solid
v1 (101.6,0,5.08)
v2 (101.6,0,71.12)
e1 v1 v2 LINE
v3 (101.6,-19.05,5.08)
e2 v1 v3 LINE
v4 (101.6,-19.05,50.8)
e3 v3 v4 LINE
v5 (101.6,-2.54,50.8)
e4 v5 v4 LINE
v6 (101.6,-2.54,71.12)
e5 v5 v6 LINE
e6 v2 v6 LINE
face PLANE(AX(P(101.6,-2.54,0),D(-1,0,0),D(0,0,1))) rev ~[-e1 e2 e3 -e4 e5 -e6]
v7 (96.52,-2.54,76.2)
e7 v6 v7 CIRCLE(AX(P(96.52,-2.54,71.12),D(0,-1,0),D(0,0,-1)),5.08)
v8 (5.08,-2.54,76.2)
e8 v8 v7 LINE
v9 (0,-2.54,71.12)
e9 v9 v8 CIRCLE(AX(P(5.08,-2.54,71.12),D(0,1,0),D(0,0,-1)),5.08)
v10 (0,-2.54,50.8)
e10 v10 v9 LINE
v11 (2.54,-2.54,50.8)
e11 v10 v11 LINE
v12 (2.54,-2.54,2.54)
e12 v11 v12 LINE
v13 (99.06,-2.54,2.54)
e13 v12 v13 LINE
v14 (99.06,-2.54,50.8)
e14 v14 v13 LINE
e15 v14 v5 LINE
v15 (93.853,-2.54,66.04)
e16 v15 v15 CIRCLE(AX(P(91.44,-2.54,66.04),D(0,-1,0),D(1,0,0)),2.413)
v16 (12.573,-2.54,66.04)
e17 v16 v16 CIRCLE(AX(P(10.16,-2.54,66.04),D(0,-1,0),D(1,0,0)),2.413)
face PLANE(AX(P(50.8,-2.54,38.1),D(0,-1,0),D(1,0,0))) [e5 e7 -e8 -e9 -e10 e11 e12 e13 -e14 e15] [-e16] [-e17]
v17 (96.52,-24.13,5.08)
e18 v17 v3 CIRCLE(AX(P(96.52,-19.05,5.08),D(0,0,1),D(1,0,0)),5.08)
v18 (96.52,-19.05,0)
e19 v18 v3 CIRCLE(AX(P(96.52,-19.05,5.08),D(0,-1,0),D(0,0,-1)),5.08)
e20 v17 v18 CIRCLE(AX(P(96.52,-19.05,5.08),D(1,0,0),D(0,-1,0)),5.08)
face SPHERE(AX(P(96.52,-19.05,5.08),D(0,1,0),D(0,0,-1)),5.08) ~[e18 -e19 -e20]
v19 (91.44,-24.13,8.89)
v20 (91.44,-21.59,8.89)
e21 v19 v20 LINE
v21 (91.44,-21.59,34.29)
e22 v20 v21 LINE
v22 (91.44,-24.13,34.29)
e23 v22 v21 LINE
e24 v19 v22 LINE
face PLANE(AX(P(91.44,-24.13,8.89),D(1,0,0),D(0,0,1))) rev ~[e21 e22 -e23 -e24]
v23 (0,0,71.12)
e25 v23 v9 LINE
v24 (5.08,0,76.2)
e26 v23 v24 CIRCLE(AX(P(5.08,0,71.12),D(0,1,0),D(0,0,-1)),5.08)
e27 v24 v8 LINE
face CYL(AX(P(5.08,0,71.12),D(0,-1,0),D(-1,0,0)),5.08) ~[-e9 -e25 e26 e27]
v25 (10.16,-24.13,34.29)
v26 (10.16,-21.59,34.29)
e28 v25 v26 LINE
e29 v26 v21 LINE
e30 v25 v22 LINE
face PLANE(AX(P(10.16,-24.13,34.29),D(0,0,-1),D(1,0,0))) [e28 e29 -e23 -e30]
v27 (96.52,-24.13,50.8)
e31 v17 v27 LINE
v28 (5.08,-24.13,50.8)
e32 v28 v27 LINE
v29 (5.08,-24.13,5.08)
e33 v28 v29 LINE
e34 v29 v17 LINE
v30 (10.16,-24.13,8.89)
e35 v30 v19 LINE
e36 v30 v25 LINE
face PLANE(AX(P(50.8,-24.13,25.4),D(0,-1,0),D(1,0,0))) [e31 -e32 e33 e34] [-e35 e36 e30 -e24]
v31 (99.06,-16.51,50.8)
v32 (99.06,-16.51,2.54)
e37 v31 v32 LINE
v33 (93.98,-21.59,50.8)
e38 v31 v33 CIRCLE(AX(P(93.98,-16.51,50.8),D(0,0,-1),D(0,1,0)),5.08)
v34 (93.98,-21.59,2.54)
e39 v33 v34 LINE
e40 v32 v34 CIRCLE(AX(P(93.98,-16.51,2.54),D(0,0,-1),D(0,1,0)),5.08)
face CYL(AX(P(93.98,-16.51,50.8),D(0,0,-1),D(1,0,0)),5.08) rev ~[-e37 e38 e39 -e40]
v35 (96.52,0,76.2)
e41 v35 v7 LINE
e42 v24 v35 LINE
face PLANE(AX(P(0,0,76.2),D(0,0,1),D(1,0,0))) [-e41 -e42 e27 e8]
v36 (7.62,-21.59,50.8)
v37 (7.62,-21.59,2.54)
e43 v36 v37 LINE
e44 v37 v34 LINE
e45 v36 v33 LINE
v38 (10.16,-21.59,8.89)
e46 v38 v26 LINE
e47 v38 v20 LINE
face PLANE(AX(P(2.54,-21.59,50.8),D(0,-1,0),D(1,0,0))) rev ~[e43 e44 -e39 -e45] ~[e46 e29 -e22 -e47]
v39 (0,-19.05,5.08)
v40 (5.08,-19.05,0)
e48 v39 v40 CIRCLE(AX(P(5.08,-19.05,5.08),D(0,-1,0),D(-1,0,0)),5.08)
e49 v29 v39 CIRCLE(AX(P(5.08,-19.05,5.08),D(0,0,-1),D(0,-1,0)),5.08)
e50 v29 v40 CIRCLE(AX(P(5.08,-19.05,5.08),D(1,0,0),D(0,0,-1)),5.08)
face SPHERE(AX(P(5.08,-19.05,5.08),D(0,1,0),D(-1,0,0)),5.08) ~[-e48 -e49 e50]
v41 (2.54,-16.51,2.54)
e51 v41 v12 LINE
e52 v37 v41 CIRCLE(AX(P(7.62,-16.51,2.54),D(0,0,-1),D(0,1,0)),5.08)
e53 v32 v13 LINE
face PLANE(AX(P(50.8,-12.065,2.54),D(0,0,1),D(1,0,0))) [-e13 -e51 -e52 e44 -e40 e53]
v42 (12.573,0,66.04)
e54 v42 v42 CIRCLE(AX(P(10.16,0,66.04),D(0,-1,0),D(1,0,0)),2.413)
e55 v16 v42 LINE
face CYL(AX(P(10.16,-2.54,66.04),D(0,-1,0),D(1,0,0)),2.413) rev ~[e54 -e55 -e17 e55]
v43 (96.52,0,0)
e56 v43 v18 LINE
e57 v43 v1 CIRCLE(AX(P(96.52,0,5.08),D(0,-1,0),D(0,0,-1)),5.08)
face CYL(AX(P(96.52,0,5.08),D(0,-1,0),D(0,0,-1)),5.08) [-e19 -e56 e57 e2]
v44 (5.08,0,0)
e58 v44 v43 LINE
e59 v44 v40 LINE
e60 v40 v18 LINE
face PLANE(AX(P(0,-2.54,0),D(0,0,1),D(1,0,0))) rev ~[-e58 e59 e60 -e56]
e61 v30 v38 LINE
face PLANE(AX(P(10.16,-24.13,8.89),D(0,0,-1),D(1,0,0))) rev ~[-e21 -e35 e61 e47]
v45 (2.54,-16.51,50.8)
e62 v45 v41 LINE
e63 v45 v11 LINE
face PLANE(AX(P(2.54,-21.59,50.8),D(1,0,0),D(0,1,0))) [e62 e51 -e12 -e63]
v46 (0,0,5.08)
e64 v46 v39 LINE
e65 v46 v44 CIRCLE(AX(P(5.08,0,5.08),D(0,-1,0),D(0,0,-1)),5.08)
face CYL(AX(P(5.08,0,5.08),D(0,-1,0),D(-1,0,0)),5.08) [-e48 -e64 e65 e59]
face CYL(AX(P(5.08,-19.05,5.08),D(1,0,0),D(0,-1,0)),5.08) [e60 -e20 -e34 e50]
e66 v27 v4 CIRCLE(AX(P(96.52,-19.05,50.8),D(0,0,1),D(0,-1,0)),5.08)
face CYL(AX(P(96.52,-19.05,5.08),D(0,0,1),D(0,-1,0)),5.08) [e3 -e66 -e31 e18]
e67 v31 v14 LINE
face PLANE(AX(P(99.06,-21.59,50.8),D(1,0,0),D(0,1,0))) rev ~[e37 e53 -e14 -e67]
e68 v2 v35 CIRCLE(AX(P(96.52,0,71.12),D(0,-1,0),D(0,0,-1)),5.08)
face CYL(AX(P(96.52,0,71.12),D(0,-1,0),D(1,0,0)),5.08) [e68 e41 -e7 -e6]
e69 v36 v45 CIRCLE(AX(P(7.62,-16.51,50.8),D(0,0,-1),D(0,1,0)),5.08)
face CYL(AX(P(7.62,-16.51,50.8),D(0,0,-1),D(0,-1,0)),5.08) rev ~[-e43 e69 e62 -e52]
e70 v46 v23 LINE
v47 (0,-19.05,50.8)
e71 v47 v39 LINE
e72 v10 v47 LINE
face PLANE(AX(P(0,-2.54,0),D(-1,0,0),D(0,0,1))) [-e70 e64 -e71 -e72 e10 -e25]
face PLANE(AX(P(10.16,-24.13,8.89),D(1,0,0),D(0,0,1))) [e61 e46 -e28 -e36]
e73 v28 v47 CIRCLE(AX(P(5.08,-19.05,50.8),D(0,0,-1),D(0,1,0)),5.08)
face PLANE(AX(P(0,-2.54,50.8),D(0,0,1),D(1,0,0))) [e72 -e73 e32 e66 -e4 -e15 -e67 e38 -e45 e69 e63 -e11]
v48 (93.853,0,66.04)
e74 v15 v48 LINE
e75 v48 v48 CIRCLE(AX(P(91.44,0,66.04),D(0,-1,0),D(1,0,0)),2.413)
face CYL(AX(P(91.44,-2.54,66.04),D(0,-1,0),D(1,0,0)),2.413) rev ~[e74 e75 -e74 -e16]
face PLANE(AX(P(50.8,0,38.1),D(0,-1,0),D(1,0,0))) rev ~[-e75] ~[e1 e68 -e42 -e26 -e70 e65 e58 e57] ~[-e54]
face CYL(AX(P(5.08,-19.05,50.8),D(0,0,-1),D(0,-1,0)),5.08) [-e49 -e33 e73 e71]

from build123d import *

# Parameters (mm, degrees)
F0_W      = 101.6
F0_H      = 76.2
F1_DEPTH  = 2.54
F2_W      = 101.6
F2_H      = 50.8
F3_DEPTH  = 21.59
F4_R      = 5.08
F5_W      = 96.52
F5_H      = 19.05
F6_DEPTH  = 48.26
F7_R      = 5.08
F8_R      = 5.08
F9_R      = 5.08
F11_W     = 81.28
F11_H     = 25.4
F12_DEPTH = 21.59
F13_R     = 2.413
F14_DEPTH = 2.541


# Not quite as in the source:
# - a feature of the source that left no trace in its solid (it failed there, or was rolled back) is left out


with BuildPart() as f1:
    # F0 (on Front) → F1 (new body)
    with BuildSketch(Plane.XZ):
        with Locations((50.8, 38.1)):
            Rectangle(F0_W, F0_H)
    extrude(amount=F1_DEPTH)

    # F2 (on face) → F3 (join)
    with BuildSketch(Plane.XZ.offset(2.54)):
        with Locations((50.8, 25.4)):
            Rectangle(F2_W, F2_H)
    extrude(amount=F3_DEPTH)

    # F4
    f4_edges = [f1.edges().sort_by_distance(p)[0] for p in [
        (101.6, -1.27, 76.2),
        (101.6, -12.065, 0),
        (0, -12.065, 0),
        (0, -1.27, 76.2),
    ]]
    fillet(f4_edges, radius=F4_R)

    # F5 (on face) → F6 (cut)
    with BuildSketch(Plane.XY.offset(50.8)):
        with Locations((50.8, -12.065)):
            Rectangle(F5_W, F5_H)
    extrude(amount=-F6_DEPTH, mode=Mode.SUBTRACT)

    # F7
    f7_edges = [f1.edges().sort_by_distance(p)[0] for p in [
        (101.6, -24.13, 27.94),
    ]]
    fillet(f7_edges, radius=F7_R)

    # F8
    f8_edges = [f1.edges().sort_by_distance(p)[0] for p in [
        (99.06, -21.59, 26.67),
    ]]
    fillet(f8_edges, radius=F8_R)

    # F9
    f9_edges = [f1.edges().sort_by_distance(p)[0] for p in [
        (2.54, -21.59, 26.67),
    ]]
    fillet(f9_edges, radius=F9_R)

    # F11 (on face) → F12 (cut, through all)
    with BuildSketch(Plane.XZ.offset(24.13)):
        with Locations((50.8, 21.59)):
            Rectangle(F11_W, F11_H)
    extrude(amount=-F12_DEPTH, mode=Mode.SUBTRACT)

    # F13 (on face) → F14 (cut, through all)
    with BuildSketch(Plane.XZ.offset(2.54)):
        with Locations((91.44, 66.04)):
            Circle(F13_R)
        with Locations((10.16, 66.04)):
            Circle(F13_R)
    extrude(amount=-F14_DEPTH, mode=Mode.SUBTRACT)


solid = f1.part
